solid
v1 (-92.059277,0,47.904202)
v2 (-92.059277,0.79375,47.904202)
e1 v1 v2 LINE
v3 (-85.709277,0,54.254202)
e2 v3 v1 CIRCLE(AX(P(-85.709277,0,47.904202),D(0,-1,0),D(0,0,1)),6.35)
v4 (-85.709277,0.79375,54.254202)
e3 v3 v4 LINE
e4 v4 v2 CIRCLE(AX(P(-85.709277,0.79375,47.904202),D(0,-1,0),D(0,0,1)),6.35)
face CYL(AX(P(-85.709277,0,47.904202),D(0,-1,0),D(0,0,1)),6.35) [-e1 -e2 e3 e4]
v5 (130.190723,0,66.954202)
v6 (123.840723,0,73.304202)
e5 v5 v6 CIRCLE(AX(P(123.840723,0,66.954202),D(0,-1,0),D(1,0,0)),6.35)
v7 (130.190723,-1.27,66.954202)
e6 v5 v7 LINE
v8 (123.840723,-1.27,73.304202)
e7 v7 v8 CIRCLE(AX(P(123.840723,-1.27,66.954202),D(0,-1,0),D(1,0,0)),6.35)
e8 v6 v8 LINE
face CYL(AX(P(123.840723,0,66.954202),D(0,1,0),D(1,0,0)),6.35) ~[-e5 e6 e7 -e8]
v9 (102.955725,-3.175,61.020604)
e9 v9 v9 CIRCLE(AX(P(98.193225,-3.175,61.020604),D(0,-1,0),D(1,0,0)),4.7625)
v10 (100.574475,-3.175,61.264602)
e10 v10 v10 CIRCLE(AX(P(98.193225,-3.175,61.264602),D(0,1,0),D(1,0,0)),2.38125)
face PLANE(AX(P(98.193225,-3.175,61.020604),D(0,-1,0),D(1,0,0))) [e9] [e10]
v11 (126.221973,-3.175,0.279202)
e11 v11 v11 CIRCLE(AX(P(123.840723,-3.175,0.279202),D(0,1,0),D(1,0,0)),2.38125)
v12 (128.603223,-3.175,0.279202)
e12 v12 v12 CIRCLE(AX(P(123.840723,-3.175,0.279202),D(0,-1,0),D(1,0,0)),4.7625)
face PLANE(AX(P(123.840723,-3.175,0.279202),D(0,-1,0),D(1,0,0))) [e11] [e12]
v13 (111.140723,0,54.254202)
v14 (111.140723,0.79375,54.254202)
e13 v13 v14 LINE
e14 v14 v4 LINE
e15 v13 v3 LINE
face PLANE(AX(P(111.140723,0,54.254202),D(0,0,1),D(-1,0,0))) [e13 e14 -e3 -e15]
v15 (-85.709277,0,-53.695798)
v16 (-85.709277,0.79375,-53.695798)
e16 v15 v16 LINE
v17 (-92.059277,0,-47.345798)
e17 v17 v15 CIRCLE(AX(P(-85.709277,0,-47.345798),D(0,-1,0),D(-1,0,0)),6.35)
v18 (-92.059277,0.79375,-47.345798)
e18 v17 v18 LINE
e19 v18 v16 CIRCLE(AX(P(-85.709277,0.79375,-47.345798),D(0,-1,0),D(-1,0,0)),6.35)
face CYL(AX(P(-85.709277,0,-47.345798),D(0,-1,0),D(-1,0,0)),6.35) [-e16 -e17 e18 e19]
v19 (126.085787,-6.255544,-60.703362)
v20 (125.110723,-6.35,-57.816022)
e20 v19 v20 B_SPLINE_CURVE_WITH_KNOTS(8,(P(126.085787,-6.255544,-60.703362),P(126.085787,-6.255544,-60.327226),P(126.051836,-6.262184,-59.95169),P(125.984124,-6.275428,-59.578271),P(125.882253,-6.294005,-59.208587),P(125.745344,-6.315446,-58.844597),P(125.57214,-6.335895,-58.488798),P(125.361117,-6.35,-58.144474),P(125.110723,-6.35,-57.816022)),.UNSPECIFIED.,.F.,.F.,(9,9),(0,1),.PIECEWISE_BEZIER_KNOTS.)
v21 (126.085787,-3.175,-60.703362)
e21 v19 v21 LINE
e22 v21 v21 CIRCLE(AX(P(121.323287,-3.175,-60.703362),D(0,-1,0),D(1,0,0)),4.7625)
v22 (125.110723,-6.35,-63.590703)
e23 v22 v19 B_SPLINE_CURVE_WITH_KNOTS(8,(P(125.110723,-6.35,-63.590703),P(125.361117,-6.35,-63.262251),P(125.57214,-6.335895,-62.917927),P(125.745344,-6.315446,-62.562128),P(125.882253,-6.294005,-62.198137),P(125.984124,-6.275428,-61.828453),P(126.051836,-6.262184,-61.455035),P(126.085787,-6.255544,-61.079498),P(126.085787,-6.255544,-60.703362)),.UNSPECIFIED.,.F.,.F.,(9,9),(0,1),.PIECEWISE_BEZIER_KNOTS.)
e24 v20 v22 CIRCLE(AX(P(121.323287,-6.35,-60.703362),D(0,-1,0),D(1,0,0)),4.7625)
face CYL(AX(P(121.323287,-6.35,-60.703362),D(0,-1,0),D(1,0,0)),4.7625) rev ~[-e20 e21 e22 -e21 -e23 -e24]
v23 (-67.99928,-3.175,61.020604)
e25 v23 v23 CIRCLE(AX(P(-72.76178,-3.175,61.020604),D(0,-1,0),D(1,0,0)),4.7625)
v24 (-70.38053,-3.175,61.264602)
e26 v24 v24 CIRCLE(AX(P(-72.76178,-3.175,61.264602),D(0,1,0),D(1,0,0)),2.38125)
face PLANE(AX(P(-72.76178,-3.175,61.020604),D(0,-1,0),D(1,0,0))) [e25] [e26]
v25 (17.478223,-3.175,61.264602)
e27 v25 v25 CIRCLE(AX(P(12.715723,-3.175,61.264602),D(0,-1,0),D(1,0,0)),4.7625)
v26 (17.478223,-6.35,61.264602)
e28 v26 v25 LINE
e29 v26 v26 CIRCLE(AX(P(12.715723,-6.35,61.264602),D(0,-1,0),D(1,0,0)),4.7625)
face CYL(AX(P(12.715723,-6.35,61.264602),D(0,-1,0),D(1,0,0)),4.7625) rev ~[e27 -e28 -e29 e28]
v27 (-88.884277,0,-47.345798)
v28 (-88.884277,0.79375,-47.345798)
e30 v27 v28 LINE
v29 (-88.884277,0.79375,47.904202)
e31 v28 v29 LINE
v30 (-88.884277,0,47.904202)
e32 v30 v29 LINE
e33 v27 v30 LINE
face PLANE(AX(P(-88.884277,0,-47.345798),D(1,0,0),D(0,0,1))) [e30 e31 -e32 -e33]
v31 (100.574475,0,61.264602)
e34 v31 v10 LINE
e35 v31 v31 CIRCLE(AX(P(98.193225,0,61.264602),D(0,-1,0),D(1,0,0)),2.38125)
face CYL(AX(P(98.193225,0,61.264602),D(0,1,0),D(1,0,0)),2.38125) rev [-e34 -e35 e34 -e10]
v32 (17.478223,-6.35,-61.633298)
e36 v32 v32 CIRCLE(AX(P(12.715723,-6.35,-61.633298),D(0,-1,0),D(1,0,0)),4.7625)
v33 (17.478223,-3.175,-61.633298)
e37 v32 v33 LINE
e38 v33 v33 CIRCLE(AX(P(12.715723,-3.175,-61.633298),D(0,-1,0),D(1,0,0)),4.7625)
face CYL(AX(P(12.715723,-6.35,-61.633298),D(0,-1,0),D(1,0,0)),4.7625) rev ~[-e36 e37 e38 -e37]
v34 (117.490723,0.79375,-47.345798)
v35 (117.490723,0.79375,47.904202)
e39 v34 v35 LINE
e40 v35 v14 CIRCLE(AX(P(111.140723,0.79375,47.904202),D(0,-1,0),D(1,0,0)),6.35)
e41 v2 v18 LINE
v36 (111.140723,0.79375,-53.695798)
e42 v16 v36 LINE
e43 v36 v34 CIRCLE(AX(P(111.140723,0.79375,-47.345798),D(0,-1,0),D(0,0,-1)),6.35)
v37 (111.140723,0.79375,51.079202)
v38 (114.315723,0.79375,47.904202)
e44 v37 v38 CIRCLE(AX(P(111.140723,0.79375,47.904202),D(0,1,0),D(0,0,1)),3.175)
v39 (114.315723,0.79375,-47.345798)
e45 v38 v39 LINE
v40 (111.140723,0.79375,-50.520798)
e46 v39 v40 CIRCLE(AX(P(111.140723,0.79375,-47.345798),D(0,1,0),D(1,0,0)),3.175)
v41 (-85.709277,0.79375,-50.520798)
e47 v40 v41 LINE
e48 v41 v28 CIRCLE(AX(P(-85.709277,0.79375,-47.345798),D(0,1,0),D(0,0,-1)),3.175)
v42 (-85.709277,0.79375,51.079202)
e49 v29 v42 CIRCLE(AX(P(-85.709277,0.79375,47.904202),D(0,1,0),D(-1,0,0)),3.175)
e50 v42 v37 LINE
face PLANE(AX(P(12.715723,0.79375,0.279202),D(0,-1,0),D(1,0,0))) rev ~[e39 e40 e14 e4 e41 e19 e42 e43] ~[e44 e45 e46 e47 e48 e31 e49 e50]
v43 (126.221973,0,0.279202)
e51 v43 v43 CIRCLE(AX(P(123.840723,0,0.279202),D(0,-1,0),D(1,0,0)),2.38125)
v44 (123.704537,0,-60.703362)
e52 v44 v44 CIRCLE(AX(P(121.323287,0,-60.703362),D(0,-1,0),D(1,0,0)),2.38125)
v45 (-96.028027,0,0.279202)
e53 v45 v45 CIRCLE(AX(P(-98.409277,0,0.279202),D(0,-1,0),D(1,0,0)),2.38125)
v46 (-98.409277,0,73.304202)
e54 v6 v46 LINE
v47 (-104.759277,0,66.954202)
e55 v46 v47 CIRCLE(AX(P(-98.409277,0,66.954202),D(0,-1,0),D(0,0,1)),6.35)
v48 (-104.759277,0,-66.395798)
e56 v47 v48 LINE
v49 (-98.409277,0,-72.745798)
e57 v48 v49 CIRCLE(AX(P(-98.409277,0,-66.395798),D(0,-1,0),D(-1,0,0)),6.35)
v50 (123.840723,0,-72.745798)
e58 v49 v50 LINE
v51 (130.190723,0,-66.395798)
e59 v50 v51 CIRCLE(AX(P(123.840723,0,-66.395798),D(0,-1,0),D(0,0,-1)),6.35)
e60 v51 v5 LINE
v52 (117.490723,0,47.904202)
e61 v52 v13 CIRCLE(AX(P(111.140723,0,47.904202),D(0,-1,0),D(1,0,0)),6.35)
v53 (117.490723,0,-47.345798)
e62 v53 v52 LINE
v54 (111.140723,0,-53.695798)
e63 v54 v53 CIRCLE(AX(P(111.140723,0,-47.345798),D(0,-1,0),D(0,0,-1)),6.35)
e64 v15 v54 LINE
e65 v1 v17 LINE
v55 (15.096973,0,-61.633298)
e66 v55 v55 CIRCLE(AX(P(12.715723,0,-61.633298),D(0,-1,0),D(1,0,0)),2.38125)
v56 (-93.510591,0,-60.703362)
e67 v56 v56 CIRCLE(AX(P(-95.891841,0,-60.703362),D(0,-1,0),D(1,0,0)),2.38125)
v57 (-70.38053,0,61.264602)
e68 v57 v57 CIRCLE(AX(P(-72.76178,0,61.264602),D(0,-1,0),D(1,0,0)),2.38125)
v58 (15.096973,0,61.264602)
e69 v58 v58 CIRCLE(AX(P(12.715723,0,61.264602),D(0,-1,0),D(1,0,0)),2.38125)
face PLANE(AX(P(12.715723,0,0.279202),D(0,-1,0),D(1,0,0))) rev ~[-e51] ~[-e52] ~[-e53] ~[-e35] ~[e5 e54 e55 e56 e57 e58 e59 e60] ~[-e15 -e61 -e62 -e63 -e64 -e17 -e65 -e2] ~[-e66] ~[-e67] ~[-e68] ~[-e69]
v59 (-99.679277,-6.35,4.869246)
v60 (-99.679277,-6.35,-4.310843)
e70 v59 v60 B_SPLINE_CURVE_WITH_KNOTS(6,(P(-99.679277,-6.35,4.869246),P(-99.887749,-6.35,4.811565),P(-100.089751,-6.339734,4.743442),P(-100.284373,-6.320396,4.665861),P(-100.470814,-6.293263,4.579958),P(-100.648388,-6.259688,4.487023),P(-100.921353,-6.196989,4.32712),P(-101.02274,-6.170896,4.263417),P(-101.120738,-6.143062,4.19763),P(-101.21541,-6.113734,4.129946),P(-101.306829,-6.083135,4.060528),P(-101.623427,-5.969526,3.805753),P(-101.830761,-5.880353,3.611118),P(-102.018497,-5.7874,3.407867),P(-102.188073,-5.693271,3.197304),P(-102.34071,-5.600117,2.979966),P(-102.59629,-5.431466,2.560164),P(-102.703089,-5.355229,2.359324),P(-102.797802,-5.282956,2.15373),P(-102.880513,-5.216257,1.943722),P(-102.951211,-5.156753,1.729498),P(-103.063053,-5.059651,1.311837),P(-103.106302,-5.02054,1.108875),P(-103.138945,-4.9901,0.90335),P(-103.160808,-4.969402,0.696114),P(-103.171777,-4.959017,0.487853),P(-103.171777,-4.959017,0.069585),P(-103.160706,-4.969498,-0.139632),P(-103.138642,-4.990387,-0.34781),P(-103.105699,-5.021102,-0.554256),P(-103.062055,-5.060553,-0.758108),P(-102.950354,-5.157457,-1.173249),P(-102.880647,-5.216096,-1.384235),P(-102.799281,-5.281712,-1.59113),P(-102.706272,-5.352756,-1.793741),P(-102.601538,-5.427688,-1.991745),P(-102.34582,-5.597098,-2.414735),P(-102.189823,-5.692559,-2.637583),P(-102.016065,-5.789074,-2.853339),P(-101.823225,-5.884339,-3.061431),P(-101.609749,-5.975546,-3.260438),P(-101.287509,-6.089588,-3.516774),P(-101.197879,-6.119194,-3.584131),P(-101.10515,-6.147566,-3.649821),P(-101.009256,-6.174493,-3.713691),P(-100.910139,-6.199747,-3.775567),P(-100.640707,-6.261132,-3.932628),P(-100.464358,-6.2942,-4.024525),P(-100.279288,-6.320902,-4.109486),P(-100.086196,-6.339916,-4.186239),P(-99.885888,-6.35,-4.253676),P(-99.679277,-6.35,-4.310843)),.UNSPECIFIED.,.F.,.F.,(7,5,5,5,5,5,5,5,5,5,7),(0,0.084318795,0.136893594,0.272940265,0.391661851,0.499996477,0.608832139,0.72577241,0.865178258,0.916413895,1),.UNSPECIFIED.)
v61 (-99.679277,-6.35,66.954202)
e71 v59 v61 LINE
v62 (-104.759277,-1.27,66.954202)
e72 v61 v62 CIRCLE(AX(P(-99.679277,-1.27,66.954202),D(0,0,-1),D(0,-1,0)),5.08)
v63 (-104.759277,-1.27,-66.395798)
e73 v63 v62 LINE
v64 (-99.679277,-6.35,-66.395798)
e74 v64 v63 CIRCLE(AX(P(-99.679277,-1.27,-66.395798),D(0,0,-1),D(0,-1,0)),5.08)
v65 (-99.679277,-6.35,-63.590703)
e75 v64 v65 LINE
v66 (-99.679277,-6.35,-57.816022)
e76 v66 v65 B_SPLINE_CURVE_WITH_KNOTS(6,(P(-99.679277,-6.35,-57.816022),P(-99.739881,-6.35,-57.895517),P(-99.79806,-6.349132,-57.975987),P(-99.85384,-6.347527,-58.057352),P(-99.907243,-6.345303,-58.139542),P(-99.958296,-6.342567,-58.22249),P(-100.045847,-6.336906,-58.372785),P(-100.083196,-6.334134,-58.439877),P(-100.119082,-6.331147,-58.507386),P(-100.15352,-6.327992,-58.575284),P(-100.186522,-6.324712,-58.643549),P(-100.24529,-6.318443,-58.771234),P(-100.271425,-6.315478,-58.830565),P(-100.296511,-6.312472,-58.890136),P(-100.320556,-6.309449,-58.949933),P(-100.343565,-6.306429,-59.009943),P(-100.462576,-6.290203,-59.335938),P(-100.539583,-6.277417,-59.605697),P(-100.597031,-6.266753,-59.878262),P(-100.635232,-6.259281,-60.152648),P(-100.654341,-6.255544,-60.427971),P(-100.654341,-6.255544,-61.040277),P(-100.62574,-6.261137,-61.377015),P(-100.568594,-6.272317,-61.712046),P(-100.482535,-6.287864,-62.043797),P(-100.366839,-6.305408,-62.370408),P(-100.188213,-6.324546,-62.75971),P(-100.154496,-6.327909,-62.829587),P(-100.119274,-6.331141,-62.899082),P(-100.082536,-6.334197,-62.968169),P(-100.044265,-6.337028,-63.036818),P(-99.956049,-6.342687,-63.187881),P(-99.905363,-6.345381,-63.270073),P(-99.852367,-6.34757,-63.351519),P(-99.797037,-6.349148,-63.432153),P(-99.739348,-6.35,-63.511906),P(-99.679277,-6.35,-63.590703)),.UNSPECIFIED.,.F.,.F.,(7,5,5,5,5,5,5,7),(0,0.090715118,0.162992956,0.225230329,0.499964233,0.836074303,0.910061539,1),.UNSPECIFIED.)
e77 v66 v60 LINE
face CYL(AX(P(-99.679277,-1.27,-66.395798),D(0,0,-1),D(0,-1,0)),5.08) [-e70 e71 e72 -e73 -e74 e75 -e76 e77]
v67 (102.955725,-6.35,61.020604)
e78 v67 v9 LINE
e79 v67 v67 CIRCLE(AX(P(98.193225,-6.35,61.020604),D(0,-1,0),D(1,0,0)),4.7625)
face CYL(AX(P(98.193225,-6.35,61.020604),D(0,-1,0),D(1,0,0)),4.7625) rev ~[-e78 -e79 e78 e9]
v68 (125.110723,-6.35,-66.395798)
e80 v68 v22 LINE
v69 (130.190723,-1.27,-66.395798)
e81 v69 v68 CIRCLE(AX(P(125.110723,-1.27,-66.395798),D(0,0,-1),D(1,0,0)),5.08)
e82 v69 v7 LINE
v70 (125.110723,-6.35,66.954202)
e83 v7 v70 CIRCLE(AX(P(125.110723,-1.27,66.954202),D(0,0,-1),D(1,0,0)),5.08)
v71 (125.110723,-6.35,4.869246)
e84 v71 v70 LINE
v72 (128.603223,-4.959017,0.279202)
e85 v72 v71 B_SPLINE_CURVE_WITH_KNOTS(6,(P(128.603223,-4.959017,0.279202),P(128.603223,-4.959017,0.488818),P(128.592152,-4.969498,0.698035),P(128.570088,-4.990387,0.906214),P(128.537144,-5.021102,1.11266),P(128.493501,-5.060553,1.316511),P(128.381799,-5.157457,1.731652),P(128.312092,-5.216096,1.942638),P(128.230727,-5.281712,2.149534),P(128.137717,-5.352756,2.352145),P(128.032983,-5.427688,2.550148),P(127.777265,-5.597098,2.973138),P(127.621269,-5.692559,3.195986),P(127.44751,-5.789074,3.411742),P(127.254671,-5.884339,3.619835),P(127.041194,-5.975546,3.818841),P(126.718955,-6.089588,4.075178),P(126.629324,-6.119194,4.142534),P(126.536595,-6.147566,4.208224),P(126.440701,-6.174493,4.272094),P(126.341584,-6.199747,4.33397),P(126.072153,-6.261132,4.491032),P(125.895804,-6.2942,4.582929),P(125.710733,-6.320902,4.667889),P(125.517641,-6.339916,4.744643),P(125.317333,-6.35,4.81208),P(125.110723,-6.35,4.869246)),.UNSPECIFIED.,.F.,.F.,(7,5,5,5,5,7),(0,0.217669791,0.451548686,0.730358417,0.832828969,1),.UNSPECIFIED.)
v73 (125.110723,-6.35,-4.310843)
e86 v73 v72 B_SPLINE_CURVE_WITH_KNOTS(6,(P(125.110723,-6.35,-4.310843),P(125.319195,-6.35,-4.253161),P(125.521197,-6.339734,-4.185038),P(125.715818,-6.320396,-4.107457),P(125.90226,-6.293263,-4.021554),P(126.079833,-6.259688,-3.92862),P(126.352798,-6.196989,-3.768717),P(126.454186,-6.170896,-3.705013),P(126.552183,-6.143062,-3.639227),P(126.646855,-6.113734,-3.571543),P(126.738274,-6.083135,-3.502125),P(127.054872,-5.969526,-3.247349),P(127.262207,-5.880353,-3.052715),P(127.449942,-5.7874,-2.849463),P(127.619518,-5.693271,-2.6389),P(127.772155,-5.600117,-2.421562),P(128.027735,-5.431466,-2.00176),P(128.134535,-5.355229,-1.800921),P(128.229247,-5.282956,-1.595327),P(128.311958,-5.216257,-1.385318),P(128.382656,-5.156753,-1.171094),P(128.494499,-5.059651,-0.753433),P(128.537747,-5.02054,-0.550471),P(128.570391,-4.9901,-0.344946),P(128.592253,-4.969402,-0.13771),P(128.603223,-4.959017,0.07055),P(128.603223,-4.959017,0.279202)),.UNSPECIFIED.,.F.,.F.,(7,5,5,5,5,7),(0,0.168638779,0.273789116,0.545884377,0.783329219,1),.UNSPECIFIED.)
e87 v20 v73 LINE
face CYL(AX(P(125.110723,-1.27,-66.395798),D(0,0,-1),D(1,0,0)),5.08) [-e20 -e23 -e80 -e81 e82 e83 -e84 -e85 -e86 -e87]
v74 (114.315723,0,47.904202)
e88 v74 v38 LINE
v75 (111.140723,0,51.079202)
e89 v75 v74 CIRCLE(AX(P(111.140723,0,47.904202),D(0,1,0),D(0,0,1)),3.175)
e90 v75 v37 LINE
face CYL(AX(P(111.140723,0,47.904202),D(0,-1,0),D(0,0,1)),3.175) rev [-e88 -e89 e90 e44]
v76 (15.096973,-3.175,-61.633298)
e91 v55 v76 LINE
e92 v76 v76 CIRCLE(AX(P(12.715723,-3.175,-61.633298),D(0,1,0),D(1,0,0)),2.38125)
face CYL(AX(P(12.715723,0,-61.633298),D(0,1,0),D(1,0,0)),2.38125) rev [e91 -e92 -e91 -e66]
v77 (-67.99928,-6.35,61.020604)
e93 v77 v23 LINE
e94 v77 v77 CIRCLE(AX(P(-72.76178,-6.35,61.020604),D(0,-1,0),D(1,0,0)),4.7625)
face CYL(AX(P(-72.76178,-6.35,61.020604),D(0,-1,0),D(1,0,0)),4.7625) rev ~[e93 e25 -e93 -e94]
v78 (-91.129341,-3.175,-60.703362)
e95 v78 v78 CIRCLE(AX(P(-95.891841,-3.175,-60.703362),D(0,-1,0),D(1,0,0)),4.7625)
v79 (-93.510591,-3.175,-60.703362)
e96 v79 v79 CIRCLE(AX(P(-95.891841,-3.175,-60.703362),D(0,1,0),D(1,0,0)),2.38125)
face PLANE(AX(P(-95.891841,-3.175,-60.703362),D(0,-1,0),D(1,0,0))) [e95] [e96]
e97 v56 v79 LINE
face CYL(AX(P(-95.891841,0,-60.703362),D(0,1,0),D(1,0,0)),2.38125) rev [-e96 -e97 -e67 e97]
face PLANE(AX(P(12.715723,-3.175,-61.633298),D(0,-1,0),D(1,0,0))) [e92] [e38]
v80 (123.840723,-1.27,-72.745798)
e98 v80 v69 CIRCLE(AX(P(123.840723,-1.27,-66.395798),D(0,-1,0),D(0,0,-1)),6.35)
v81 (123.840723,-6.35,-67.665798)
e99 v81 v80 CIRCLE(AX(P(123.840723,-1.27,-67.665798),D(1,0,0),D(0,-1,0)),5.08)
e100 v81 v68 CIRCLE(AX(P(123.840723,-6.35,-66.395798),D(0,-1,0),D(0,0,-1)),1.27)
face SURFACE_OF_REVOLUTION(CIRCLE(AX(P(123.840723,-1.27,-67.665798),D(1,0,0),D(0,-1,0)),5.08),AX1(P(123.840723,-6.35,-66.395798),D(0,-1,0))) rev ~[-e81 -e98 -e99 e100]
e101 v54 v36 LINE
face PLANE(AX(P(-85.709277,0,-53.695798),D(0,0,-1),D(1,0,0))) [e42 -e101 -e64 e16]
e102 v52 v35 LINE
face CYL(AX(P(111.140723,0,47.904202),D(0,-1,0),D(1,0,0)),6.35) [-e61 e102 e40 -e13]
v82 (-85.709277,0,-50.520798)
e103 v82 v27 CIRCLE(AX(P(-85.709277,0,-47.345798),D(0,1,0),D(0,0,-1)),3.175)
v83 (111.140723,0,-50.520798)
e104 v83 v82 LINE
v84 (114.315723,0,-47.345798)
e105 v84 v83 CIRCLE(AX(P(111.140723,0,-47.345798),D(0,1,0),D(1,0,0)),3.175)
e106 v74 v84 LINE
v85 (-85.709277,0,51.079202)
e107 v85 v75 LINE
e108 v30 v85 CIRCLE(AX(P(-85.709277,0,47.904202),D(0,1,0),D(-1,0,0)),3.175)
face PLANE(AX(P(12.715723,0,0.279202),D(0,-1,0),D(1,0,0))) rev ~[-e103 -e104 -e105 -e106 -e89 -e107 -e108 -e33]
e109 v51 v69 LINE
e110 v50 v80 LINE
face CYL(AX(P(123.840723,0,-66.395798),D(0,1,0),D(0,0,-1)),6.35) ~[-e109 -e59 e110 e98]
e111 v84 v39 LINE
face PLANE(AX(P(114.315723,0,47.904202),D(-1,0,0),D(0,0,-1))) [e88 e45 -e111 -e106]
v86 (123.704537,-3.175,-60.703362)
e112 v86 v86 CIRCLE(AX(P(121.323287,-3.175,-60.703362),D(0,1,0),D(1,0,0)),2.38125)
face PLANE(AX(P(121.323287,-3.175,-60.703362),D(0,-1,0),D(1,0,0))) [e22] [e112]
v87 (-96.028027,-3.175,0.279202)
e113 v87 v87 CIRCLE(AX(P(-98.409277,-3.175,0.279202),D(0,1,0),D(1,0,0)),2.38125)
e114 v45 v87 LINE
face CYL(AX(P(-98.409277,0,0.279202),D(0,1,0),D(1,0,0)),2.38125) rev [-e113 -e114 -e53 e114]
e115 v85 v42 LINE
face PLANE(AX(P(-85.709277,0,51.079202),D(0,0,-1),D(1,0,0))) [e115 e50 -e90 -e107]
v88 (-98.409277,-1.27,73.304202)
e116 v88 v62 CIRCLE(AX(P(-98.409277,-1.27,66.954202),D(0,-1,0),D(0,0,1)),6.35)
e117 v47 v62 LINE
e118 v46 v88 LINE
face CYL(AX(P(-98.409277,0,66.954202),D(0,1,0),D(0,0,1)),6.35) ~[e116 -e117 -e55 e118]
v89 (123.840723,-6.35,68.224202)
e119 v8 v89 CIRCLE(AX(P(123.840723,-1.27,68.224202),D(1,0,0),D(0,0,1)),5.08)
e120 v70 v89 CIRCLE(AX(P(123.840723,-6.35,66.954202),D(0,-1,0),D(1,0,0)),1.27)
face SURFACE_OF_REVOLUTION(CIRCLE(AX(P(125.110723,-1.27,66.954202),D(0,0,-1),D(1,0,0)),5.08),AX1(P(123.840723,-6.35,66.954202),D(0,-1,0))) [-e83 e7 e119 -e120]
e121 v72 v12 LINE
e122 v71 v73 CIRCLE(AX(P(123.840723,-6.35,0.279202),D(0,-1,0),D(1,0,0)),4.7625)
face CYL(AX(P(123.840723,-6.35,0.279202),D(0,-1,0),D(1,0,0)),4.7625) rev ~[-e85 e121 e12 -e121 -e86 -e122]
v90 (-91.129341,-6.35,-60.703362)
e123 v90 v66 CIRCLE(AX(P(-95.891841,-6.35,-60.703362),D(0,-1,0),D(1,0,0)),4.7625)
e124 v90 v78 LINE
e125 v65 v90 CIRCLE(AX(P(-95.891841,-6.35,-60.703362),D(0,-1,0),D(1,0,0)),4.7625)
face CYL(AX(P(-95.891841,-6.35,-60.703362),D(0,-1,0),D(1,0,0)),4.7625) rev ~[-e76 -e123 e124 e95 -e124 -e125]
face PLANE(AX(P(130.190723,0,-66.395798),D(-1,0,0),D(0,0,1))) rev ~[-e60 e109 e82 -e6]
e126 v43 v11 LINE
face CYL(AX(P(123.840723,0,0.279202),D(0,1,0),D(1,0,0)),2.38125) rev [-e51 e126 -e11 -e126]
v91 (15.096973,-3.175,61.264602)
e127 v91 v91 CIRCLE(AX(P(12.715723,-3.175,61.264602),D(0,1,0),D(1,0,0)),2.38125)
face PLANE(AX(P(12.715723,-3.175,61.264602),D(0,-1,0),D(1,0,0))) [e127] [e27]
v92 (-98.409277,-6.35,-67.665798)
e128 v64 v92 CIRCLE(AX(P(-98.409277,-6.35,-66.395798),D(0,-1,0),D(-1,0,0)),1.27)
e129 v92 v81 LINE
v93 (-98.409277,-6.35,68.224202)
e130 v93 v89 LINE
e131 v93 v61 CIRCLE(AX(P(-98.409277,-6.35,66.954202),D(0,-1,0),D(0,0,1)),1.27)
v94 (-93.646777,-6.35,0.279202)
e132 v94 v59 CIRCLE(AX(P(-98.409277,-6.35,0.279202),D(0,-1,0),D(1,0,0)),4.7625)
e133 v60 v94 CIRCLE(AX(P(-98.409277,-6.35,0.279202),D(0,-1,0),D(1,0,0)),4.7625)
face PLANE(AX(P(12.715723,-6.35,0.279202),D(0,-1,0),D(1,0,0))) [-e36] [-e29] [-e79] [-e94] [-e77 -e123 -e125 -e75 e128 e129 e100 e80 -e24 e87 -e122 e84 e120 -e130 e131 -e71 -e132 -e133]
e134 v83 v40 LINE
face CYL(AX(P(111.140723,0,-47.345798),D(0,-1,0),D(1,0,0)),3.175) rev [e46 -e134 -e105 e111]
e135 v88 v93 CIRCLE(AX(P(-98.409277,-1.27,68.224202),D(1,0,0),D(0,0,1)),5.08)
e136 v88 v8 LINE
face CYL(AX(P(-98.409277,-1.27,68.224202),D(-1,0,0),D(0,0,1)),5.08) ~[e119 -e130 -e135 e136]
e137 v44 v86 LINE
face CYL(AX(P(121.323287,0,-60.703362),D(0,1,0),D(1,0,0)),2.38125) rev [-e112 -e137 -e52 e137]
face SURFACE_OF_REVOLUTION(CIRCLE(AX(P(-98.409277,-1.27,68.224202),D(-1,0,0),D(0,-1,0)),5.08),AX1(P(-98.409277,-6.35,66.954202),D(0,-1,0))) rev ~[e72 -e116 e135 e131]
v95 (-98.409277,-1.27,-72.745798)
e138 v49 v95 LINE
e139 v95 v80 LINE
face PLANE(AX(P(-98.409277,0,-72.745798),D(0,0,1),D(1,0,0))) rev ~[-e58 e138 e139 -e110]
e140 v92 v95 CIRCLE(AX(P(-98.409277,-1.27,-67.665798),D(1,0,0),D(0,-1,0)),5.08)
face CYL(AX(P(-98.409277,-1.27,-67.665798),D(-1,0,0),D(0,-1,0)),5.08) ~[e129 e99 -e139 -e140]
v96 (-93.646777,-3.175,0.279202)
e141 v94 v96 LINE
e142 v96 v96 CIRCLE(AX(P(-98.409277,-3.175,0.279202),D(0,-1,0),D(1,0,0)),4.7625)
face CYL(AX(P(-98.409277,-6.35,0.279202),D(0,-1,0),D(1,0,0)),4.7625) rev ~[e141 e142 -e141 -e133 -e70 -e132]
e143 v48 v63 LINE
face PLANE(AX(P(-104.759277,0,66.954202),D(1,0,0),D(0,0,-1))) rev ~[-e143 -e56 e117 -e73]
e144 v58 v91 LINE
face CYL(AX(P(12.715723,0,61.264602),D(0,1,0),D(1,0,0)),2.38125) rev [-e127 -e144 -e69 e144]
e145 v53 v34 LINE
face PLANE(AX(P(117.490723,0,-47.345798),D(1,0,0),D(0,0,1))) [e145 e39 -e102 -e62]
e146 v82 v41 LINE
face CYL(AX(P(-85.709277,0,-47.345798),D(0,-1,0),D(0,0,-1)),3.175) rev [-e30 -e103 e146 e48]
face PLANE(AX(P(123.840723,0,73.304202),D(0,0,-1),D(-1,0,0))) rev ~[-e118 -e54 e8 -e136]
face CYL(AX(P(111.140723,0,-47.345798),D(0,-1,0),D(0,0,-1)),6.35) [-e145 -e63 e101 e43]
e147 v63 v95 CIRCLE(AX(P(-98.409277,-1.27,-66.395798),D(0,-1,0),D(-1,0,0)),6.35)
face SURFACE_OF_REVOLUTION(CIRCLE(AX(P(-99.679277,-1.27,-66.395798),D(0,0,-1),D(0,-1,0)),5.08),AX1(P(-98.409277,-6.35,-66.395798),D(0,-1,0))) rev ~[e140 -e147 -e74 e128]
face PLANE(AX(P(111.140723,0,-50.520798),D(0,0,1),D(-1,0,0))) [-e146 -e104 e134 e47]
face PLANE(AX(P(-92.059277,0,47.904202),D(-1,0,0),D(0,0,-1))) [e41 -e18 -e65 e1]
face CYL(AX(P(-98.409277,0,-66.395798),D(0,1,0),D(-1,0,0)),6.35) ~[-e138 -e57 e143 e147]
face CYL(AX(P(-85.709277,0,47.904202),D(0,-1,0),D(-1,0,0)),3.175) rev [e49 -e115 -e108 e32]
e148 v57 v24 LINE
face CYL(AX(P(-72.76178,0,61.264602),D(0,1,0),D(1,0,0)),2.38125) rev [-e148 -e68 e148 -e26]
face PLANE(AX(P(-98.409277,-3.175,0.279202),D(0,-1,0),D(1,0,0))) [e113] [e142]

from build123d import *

# Parameters (mm, degrees)
F0_R         = 2.38125
F1_DEPTH     = 6.35
F2_R         = 4.7625
F3_DEPTH     = 3.175
F4_T1_DEPTH  = 133.35
F4_T3_DEPTH  = 222.25
F4_T6_ANGLE  = 90
F4_T8_ANGLE  = 90
F4_T10_ANGLE = 90
F4_T12_ANGLE = 90
F6_DEPTH     = 0.79375
F8_R         = 4.7625
F9_DEPTH     = 3.175


# Not quite as in the source:
# - a fillet or chamfer that OpenCascade refuses, or shapes differently, is made with other operations: its cross-section is extruded or revolved along the edge and cut away or added


with BuildPart() as f1:
    # F0 (on Front) → F1 (new body)
    with BuildSketch(Plane.XZ):
        with BuildLine():
            Line((123.8407226482, 73.3042017429), (-98.4092773518, 73.3042017429))
            ThreePointArc((-98.4092773518, 73.3042017429), (-102.8994054124, 71.4443298034), (-104.7592773518, 66.9542017429))
            Line((-104.7592773518, 66.9542017429), (-104.7592773518, -66.3957982571))
            ThreePointArc((-104.7592773518, -66.3957982571), (-102.8994054124, -70.8859263176), (-98.4092773518, -72.7457982571))
            Line((-98.4092773518, -72.7457982571), (123.8407226482, -72.7457982571))
            ThreePointArc((123.8407226482, -72.7457982571), (128.3308507087, -70.8859263176), (130.1907226482, -66.3957982571))
            Line((130.1907226482, -66.3957982571), (130.1907226482, 66.9542017429))
            ThreePointArc((130.1907226482, 66.9542017429), (128.3308507087, 71.4443298034), (123.8407226482, 73.3042017429))
        make_face()
        with Locations((-95.8918413821, -60.7033622874)):
            Circle(F0_R, mode=Mode.SUBTRACT)
        with Locations((12.7157226482, -61.6332982571)):
            Circle(F0_R, mode=Mode.SUBTRACT)
        with Locations((-98.4092773518, 0.2792017429)):
            Circle(F0_R, mode=Mode.SUBTRACT)
        with Locations((121.3232866785, -60.7033622874)):
            Circle(F0_R, mode=Mode.SUBTRACT)
        with Locations((123.8407226482, 0.2792017429)):
            Circle(F0_R, mode=Mode.SUBTRACT)
        with Locations((-72.7617797518, 61.2646017429)):
            Circle(F0_R, mode=Mode.SUBTRACT)
        with Locations((12.7157226482, 61.2646017429)):
            Circle(F0_R, mode=Mode.SUBTRACT)
        with Locations((98.1932250482, 61.2646017429)):
            Circle(F0_R, mode=Mode.SUBTRACT)
    extrude(amount=F1_DEPTH)

    # F2 (on face) → F3 (cut)
    with BuildSketch(Plane.XZ.offset(6.35)):
        with Locations((12.7157226482, 61.2646017429)):
            Circle(F2_R)
        with Locations((123.8407226482, 0.2792017429)):
            Circle(F2_R)
        with Locations((121.3232866785, -60.7033622874)):
            Circle(F2_R)
        with Locations((12.7157226482, -61.6332982571)):
            Circle(F2_R)
        with Locations((-95.8918413821, -60.7033622874)):
            Circle(F2_R)
        with Locations((-98.4092773518, 0.2792017429)):
            Circle(F2_R)
    extrude(amount=-F3_DEPTH, mode=Mode.SUBTRACT)

    # F4: fillet of radius 5.08 on 8 edges, made by hand

    # F4_s2 → F4_t1 (cut)
    with BuildSketch(Plane.XY.offset(-66.3957982571)):
        with BuildLine():
            ThreePointArc((-99.6792773518, -6.35), (-103.2713798002, -4.8621024484), (-104.7592773518, -1.27))
            Line((-104.7592773518, -1.27), (-104.7592773518, -6.35))
            Line((-104.7592773518, -6.35), (-99.6792773518, -6.35))
        make_face()
        with BuildLine():
            ThreePointArc((130.1907226482, -1.27), (128.7028250966, -4.8621024484), (125.1107226482, -6.35))
            Line((125.1107226482, -6.35), (130.1907226482, -6.35))
            Line((130.1907226482, -6.35), (130.1907226482, -1.27))
        make_face()
    extrude(amount=F4_T1_DEPTH, mode=Mode.SUBTRACT)

    # F4_s4 → F4_t3 (cut)
    with BuildSketch(Plane.YZ.offset(-98.4092773518)):
        with BuildLine():
            ThreePointArc((-1.27, 73.3042017429), (-4.8621024484, 71.8163041913), (-6.35, 68.2242017429))
            Line((-6.35, 68.2242017429), (-6.35, 73.3042017429))
            Line((-6.35, 73.3042017429), (-1.27, 73.3042017429))
        make_face()
        with BuildLine():
            ThreePointArc((-6.35, -67.6657982571), (-4.8621024484, -71.2579007055), (-1.27, -72.7457982571))
            Line((-1.27, -72.7457982571), (-6.35, -72.7457982571))
            Line((-6.35, -72.7457982571), (-6.35, -67.6657982571))
        make_face()
    extrude(amount=F4_T3_DEPTH, mode=Mode.SUBTRACT)

    # F4_s5 → F4_t6 (revolve, cut)
    with BuildSketch(Plane.YZ.offset(-98.4092773518)):
        with BuildLine():
            ThreePointArc((-6.35, 68.2242017429), (-4.8621024484, 71.8163041913), (-1.27, 73.3042017429))
            Line((-1.27, 73.3042017429), (-6.35, 73.3042017429))
            Line((-6.35, 73.3042017429), (-6.35, 68.2242017429))
        make_face()
    revolve(axis=Axis((-98.4092773518, -6.35, 66.9542017429), (0, -1, 0)), revolution_arc=F4_T6_ANGLE, mode=Mode.SUBTRACT)

    # F4_s7 → F4_t8 (revolve, cut)
    with BuildSketch(Plane.XY.offset(66.9542017429)):
        with BuildLine():
            ThreePointArc((130.1907226482, -1.27), (128.7028250966, -4.8621024484), (125.1107226482, -6.35))
            Line((125.1107226482, -6.35), (130.1907226482, -6.35))
            Line((130.1907226482, -6.35), (130.1907226482, -1.27))
        make_face()
    revolve(axis=Axis((123.8407226482, -6.35, 66.9542017429), (0, -1, 0)), revolution_arc=F4_T8_ANGLE, mode=Mode.SUBTRACT)

    # F4_s9 → F4_t10 (revolve, cut)
    with BuildSketch(Plane.YZ.offset(123.8407226482)):
        with BuildLine():
            ThreePointArc((-6.35, -67.6657982571), (-4.8621024484, -71.2579007055), (-1.27, -72.7457982571))
            Line((-1.27, -72.7457982571), (-6.35, -72.7457982571))
            Line((-6.35, -72.7457982571), (-6.35, -67.6657982571))
        make_face()
    revolve(axis=Axis((123.8407226482, -6.35, -66.3957982571), (0, -1, 0)), revolution_arc=F4_T10_ANGLE, mode=Mode.SUBTRACT)

    # F4_s11 → F4_t12 (revolve, cut)
    with BuildSketch(Plane.XY.offset(-66.3957982571)):
        with BuildLine():
            ThreePointArc((-99.6792773518, -6.35), (-103.2713798002, -4.8621024484), (-104.7592773518, -1.27))
            Line((-104.7592773518, -1.27), (-104.7592773518, -6.35))
            Line((-104.7592773518, -6.35), (-99.6792773518, -6.35))
        make_face()
    revolve(axis=Axis((-98.4092773518, -6.35, -66.3957982571), (0, -1, 0)), revolution_arc=F4_T12_ANGLE, mode=Mode.SUBTRACT)

    # F5 (on face) → F6 (join)
    with BuildSketch(Plane.XZ):
        with BuildLine():
            Line((-92.0592773518, 47.9042017429), (-92.0592773518, -47.3457982571))
            ThreePointArc((-92.0592773518, -47.3457982571), (-90.1994054124, -51.8359263176), (-85.7092773518, -53.6957982571))
            Line((-85.7092773518, -53.6957982571), (111.1407226482, -53.6957982571))
            ThreePointArc((111.1407226482, -53.6957982571), (115.6308507087, -51.8359263176), (117.4907226482, -47.3457982571))
            Line((117.4907226482, -47.3457982571), (117.4907226482, 47.9042017429))
            ThreePointArc((117.4907226482, 47.9042017429), (115.6308507087, 52.3943298034), (111.1407226482, 54.2542017429))
            Line((111.1407226482, 54.2542017429), (-85.7092773518, 54.2542017429))
            ThreePointArc((-85.7092773518, 54.2542017429), (-90.1994054124, 52.3943298034), (-92.0592773518, 47.9042017429))
        make_face()
        with BuildLine():
            ThreePointArc((-88.8842773518, 47.9042017429), (-87.9543413821, 50.1492657732), (-85.7092773518, 51.0792017429))
            Line((-85.7092773518, 51.0792017429), (111.1407226482, 51.0792017429))
            ThreePointArc((111.1407226482, 51.0792017429), (113.3857866785, 50.1492657732), (114.3157226482, 47.9042017429))
            Line((114.3157226482, 47.9042017429), (114.3157226482, -47.3457982571))
            ThreePointArc((114.3157226482, -47.3457982571), (113.3857866785, -49.5908622874), (111.1407226482, -50.5207982571))
            Line((111.1407226482, -50.5207982571), (-85.7092773518, -50.5207982571))
            ThreePointArc((-85.7092773518, -50.5207982571), (-87.9543413821, -49.5908622874), (-88.8842773518, -47.3457982571))
            Line((-88.8842773518, -47.3457982571), (-88.8842773518, 47.9042017429))
        make_face(mode=Mode.SUBTRACT)
    extrude(amount=-F6_DEPTH)

    # F8 (on face) → F9 (cut)
    with BuildSketch(Plane.XZ.offset(6.35)):
        with Locations((-72.7617797518, 61.0206037701)):
            Circle(F8_R)
        with Locations((98.1932250482, 61.0206037701)):
            Circle(F8_R)
    extrude(amount=-F9_DEPTH, mode=Mode.SUBTRACT)


solid = f1.part
